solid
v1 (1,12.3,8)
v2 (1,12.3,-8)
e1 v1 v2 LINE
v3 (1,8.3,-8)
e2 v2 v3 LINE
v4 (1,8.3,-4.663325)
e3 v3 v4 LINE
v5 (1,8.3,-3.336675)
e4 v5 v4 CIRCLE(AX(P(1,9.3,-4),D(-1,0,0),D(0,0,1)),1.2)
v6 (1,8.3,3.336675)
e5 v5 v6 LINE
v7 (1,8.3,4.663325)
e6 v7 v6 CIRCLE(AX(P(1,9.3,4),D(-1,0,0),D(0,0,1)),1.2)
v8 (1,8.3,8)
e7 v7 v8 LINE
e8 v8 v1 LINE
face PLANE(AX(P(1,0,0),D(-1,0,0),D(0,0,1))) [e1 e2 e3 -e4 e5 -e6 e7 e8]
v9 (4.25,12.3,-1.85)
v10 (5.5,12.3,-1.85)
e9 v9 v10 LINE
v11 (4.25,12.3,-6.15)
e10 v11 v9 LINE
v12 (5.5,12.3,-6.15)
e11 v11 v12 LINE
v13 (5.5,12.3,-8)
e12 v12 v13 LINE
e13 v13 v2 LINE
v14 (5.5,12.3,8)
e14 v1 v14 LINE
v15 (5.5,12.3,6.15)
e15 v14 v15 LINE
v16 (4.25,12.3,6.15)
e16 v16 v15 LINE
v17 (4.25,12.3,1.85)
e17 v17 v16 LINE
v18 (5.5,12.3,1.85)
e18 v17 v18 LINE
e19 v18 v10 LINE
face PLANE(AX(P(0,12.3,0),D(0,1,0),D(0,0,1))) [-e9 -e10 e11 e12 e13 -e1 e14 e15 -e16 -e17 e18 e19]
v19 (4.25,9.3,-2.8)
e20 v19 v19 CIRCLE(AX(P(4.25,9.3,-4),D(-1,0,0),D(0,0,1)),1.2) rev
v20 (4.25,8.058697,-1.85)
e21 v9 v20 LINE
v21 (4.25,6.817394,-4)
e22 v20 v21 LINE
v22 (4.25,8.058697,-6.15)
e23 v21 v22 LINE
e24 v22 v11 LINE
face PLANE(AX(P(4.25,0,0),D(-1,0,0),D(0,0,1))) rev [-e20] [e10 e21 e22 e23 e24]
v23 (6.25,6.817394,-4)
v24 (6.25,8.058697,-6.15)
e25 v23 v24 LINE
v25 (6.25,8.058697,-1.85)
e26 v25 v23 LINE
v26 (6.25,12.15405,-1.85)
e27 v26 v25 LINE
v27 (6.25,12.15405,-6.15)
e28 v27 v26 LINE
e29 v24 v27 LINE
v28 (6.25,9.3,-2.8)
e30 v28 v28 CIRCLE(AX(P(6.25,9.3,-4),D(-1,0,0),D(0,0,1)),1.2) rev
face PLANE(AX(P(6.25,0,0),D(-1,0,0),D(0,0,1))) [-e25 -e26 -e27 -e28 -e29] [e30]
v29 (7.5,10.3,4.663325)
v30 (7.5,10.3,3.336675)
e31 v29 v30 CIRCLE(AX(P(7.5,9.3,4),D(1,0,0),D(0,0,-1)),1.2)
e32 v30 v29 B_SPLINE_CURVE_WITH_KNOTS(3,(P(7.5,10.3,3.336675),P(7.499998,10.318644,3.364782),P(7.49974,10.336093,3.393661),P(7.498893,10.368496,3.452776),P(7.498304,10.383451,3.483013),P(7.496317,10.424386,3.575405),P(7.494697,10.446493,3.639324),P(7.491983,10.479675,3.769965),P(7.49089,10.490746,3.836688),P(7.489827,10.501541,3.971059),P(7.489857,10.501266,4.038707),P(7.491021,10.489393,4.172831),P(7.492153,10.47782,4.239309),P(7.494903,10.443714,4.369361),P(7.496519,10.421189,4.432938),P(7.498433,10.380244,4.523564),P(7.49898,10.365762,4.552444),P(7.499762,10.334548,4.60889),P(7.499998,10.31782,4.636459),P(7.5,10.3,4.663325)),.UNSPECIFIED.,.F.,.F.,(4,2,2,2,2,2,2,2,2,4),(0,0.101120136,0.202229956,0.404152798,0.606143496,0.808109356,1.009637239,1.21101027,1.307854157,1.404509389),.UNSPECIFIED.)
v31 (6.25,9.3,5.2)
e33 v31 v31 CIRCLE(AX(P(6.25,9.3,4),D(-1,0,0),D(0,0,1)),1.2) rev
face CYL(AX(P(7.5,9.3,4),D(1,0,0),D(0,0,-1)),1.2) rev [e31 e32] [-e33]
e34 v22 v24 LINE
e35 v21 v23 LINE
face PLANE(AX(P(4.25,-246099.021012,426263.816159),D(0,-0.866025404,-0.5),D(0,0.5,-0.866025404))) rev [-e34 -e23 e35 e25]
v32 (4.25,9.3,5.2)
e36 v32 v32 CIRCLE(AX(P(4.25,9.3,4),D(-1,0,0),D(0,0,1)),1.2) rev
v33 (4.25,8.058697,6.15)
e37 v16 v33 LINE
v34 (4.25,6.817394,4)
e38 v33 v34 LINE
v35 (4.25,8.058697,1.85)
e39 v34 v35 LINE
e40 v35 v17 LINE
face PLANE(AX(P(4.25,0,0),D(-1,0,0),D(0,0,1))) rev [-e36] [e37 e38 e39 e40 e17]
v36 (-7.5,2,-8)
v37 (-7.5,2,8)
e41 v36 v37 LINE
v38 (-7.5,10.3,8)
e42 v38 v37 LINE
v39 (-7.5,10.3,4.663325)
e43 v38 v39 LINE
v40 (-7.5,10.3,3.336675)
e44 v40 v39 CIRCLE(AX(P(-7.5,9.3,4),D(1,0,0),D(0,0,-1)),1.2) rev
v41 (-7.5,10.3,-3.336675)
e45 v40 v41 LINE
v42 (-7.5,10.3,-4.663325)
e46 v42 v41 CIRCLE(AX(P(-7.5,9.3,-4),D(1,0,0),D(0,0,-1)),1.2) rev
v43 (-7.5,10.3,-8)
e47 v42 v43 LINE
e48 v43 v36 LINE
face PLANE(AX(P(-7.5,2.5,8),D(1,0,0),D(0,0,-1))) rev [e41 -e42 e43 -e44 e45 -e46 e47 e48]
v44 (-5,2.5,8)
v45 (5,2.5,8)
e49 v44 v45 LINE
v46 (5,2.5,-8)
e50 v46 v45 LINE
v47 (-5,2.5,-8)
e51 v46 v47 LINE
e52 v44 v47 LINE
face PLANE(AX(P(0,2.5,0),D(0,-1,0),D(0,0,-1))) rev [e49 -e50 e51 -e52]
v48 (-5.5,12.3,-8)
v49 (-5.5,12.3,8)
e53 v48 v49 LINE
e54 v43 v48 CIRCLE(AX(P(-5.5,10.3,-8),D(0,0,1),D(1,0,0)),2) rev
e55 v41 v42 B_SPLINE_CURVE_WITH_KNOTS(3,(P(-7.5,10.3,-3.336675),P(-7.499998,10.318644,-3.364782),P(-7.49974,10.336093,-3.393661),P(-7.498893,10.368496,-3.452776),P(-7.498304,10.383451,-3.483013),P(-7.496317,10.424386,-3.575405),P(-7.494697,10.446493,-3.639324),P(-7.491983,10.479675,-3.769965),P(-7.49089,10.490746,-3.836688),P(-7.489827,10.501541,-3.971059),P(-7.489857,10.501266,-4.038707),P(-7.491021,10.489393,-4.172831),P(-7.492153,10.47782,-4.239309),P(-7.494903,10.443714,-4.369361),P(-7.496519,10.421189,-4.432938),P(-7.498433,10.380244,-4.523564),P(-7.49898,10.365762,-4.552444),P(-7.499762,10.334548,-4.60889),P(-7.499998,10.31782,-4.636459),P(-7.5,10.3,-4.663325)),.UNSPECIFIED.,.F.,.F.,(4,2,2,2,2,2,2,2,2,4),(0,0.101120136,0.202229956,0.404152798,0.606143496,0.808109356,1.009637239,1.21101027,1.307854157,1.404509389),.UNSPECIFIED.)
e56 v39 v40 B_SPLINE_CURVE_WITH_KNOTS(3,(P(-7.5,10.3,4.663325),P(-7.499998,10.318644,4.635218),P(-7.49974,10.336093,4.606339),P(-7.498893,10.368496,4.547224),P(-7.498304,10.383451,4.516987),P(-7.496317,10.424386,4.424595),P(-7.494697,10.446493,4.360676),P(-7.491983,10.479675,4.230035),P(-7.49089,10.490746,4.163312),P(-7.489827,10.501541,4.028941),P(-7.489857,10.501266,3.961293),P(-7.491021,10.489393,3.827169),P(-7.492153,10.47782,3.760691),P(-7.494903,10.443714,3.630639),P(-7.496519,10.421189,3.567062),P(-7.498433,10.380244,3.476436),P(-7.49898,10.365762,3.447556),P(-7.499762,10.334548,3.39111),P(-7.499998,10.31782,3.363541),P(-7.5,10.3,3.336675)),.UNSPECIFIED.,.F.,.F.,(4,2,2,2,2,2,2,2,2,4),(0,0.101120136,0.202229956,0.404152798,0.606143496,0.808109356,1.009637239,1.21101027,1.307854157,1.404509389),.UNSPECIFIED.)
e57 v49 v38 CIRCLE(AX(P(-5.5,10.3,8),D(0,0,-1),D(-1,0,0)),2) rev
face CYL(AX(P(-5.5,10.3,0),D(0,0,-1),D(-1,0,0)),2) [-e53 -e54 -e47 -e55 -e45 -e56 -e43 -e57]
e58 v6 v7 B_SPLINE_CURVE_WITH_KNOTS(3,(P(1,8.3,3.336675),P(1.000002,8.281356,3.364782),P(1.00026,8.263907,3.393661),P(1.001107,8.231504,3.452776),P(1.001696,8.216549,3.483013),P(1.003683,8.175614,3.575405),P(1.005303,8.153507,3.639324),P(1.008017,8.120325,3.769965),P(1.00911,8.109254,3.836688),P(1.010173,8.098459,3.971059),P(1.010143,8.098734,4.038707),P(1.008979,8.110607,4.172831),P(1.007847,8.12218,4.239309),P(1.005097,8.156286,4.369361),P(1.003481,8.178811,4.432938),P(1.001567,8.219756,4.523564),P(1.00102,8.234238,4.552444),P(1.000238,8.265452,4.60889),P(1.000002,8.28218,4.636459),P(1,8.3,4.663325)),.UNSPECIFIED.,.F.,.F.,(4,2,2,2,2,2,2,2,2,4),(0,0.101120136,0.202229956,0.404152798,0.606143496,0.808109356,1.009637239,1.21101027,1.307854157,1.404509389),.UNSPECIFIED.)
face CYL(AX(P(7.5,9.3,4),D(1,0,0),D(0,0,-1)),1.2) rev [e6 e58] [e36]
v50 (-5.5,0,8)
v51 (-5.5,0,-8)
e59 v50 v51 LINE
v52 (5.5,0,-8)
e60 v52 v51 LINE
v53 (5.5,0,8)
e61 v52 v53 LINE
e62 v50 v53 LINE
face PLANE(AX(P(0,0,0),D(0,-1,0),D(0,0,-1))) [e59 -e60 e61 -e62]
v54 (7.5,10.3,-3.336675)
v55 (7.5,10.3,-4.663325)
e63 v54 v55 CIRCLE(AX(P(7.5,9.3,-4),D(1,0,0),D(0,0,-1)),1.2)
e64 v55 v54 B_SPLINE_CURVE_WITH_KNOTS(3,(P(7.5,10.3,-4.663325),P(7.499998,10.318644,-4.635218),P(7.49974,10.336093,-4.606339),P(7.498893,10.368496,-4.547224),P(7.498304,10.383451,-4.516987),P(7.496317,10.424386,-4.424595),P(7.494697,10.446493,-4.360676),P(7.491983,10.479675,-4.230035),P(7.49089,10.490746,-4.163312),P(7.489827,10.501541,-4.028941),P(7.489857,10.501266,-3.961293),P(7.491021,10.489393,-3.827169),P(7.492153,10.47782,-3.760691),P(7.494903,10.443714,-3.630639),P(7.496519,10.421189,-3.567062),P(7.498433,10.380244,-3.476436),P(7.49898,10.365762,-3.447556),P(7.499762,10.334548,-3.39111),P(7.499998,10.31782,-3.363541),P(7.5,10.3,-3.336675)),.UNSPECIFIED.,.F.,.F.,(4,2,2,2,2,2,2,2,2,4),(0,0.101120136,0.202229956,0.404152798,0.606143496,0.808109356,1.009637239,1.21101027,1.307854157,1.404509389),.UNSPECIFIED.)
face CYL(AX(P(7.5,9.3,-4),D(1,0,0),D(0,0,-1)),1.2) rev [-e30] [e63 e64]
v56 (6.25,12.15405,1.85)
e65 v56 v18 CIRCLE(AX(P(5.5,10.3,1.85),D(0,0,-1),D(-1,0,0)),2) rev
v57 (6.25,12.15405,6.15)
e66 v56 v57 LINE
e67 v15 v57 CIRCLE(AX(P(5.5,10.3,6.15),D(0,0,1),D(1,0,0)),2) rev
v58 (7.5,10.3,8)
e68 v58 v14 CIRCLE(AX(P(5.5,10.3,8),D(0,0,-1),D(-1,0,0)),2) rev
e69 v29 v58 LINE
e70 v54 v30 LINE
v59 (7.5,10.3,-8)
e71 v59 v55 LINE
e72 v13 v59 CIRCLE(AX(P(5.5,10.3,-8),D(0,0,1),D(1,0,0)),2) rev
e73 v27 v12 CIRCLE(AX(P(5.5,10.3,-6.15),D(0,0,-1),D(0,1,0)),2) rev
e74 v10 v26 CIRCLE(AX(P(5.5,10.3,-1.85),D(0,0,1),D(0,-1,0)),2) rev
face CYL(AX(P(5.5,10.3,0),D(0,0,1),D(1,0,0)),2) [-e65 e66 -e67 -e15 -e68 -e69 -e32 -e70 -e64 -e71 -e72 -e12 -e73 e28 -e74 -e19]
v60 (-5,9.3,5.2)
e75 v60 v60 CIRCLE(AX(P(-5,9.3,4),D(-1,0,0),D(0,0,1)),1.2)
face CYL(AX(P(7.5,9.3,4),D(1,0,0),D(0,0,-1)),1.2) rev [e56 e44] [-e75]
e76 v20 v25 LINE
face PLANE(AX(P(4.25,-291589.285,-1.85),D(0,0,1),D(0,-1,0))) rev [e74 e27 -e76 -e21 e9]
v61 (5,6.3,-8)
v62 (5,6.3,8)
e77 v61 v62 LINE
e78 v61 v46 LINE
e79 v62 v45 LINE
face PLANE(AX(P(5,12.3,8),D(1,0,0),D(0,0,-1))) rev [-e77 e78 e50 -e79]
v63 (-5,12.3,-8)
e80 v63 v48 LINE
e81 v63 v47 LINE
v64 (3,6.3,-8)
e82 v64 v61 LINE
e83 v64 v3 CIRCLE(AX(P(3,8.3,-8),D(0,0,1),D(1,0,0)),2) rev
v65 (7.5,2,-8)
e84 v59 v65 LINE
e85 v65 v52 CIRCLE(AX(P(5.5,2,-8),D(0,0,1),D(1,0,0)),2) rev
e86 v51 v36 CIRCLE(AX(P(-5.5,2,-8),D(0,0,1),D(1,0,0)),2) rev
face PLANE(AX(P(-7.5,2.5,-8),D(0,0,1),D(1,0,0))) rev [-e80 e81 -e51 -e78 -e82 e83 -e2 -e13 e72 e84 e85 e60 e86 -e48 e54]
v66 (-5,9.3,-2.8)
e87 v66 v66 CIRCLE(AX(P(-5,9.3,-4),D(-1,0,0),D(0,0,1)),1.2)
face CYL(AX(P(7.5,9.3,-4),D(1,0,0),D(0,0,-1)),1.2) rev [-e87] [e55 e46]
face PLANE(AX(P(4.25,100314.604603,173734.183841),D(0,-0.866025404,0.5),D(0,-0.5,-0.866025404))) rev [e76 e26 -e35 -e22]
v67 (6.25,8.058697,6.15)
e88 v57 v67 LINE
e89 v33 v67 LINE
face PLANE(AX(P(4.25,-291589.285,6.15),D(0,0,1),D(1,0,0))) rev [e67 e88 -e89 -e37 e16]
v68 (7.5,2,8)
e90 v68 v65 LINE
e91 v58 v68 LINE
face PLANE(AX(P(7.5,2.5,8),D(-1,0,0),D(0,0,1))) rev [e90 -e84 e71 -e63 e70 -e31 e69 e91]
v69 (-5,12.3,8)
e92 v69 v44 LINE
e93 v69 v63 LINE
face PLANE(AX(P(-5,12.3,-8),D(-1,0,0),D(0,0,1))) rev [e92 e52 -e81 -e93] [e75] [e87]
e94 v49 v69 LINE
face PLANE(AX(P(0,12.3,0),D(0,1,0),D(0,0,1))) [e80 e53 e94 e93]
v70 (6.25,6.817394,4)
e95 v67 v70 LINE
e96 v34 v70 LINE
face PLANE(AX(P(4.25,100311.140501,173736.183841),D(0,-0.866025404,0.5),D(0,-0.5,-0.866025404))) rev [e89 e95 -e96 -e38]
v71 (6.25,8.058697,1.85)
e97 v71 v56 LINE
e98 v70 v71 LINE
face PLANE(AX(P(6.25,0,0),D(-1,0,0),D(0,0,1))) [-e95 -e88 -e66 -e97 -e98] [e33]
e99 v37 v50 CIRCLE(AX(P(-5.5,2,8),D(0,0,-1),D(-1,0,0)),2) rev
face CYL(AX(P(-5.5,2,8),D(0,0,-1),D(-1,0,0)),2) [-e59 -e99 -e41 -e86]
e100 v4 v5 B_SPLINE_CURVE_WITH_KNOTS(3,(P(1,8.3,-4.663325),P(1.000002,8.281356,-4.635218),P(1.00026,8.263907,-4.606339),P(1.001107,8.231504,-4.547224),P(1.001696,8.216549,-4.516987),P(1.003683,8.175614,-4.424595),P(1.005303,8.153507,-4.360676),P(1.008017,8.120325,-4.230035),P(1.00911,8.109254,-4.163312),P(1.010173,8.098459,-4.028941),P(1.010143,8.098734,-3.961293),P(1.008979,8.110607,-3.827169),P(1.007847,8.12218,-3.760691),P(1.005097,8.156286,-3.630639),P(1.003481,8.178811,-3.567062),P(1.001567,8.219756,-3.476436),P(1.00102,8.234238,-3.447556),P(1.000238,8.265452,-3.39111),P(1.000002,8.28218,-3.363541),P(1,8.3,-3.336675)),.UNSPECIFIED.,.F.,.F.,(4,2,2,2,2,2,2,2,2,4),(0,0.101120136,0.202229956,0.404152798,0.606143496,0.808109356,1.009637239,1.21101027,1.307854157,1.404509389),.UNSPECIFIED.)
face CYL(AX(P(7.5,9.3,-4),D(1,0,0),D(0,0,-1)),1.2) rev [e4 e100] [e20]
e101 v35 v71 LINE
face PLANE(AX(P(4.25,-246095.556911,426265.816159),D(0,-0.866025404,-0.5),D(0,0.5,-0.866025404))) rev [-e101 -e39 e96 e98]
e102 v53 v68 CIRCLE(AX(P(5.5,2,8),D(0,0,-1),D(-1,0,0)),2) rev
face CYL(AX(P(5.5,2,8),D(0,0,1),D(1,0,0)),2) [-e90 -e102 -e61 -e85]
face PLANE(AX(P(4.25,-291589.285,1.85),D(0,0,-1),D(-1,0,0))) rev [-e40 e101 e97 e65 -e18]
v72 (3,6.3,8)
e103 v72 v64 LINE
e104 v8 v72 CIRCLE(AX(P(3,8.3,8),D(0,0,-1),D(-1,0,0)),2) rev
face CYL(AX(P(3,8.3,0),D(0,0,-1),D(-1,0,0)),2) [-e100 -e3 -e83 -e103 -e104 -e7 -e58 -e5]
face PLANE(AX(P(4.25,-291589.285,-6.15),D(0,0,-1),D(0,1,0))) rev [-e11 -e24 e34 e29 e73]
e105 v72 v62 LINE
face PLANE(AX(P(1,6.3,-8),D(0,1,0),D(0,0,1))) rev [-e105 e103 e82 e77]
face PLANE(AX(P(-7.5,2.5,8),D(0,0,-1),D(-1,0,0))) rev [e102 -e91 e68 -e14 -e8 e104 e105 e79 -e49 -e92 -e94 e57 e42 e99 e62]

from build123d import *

# Parameters (mm, degrees)
SKETCH3_W                = 15
SKETCH3_H                = 16
BOSS_EXTRUDE1_DEPTH      = 2.5
SKETCH4_W                = 2.5
SKETCH4_H                = 16
BOSS_EXTRUDE2_DEPTH      = 9.8
M2_CLEARANCE_HOLE1_D     = 2.4
M2_CLEARANCE_HOLE1_DEPTH = 15
M2_CLEARANCE_HOLE1_TIP   = 0.721032743
FILLET1_R                = 2
BOSS_EXTRUDE3_START      = 4
SKETCH9_W                = 16
SKETCH9_H                = 6
SKETCH9_R                = 1.2
BOSS_EXTRUDE3_DEPTH      = 4
FILLET2_R                = 2
CUT_EXTRUDE1_START       = -1.25
CUT_EXTRUDE1_DEPTH       = 2


with BuildPart() as part:
    # Sketch3 → Boss-Extrude1 (new body)
    with BuildSketch(Plane(origin=(0, 0, 0), x_dir=(1, 0, 0), z_dir=(0, 1, 0))):
        Rectangle(SKETCH3_W, SKETCH3_H)
    extrude(amount=BOSS_EXTRUDE1_DEPTH)

    # Sketch4 → Boss-Extrude2 (add)
    with BuildSketch(Plane(origin=(0, 2.5, 0), x_dir=(1, 0, 0), z_dir=(0, 1, 0))):
        with Locations((-6.25, 0)):
            Rectangle(SKETCH4_W, SKETCH4_H)
        with Locations((6.25, 0)):
            Rectangle(SKETCH4_W, SKETCH4_H)
    extrude(amount=BOSS_EXTRUDE2_DEPTH)

    # M2 Clearance Hole1
    with Locations(Plane(origin=(7.5, 0, 0), x_dir=(0, 0, -1), z_dir=(1, 0, 0))):
        with Locations((-4, 9.3), (4, 9.3)):
            Hole(M2_CLEARANCE_HOLE1_D / 2, depth=M2_CLEARANCE_HOLE1_DEPTH)
            with Locations((0, 0, -(M2_CLEARANCE_HOLE1_DEPTH + M2_CLEARANCE_HOLE1_TIP / 2))):  # 118° drill point
                Cone(0, M2_CLEARANCE_HOLE1_D / 2, M2_CLEARANCE_HOLE1_TIP, mode=Mode.SUBTRACT)

    # Fillet1
    fillet1_edges = [part.edges().sort_by_distance(p)[0] for p in [
        (-7.5, 0, 0),
        (7.5, 0, 0),
    ]]
    fillet(fillet1_edges, radius=FILLET1_R)

    # Sketch9 → Boss-Extrude3 (add)
    with BuildSketch(Plane.ZY.offset(-5).offset(BOSS_EXTRUDE3_START)):
        with Locations((0, 9.3)):
            Rectangle(SKETCH9_W, SKETCH9_H)
        with Locations(Location((-4, 9.3, 0), (0, 0, 180))):
            Circle(SKETCH9_R, mode=Mode.SUBTRACT)
        with Locations(Location((4, 9.3, 0), (0, 0, 180))):
            Circle(SKETCH9_R, mode=Mode.SUBTRACT)
    extrude(amount=-BOSS_EXTRUDE3_DEPTH)

    # Fillet2
    # the kernel refuses this fillet: 2 mm, written as the material it takes off along each edge
    with BuildSketch(Plane(origin=(-7.5, 12.3, 13), x_dir=(1, 0, 0), z_dir=(0, 0, -1)), Plane(origin=(1, 6.3, 13), x_dir=(0, 1, 0), z_dir=(0, 0, -1))) as fillet2_piece_1:
        with BuildLine():
            CenterArc((FILLET2_R, FILLET2_R), FILLET2_R, 180, 90)
            Line((0, FILLET2_R), (0, 0))
            Line((0, 0), (FILLET2_R, 0))
        make_face()
    extrude(amount=26, mode=Mode.SUBTRACT)
    with BuildSketch(Plane(origin=(7.5, 12.3, -13), x_dir=(0, -1, 0), z_dir=(0, 0, 1))) as fillet2_piece_2:
        with BuildLine():
            CenterArc((FILLET2_R, -FILLET2_R), FILLET2_R, 90, 90)
            Line((0, -FILLET2_R), (0, 0))
            Line((0, 0), (FILLET2_R, 0))
        make_face()
    extrude(amount=26, mode=Mode.SUBTRACT)

    # Sketch10 → Cut-Extrude1 (cut)
    with BuildSketch(Plane(origin=(7.5, 0, 0), x_dir=(0, 0, -1), z_dir=(1, 0, 0)).offset(CUT_EXTRUDE1_START)):
        Polygon((-4, 6.817393842), (-1.85, 8.058696921), (-1.85, 10.541303079), (-1.85, 12.3), (-6.15, 12.3), (-6.15, 10.541303079), (-6.15, 8.058696921), align=None)
        Polygon((4, 6.817393842), (6.15, 8.058696921), (6.15, 10.541303079), (6.15, 12.3), (1.85, 12.3), (1.85, 10.541303079), (1.85, 8.058696921), align=None)
    extrude(amount=-CUT_EXTRUDE1_DEPTH, mode=Mode.SUBTRACT)


solid = part.part
